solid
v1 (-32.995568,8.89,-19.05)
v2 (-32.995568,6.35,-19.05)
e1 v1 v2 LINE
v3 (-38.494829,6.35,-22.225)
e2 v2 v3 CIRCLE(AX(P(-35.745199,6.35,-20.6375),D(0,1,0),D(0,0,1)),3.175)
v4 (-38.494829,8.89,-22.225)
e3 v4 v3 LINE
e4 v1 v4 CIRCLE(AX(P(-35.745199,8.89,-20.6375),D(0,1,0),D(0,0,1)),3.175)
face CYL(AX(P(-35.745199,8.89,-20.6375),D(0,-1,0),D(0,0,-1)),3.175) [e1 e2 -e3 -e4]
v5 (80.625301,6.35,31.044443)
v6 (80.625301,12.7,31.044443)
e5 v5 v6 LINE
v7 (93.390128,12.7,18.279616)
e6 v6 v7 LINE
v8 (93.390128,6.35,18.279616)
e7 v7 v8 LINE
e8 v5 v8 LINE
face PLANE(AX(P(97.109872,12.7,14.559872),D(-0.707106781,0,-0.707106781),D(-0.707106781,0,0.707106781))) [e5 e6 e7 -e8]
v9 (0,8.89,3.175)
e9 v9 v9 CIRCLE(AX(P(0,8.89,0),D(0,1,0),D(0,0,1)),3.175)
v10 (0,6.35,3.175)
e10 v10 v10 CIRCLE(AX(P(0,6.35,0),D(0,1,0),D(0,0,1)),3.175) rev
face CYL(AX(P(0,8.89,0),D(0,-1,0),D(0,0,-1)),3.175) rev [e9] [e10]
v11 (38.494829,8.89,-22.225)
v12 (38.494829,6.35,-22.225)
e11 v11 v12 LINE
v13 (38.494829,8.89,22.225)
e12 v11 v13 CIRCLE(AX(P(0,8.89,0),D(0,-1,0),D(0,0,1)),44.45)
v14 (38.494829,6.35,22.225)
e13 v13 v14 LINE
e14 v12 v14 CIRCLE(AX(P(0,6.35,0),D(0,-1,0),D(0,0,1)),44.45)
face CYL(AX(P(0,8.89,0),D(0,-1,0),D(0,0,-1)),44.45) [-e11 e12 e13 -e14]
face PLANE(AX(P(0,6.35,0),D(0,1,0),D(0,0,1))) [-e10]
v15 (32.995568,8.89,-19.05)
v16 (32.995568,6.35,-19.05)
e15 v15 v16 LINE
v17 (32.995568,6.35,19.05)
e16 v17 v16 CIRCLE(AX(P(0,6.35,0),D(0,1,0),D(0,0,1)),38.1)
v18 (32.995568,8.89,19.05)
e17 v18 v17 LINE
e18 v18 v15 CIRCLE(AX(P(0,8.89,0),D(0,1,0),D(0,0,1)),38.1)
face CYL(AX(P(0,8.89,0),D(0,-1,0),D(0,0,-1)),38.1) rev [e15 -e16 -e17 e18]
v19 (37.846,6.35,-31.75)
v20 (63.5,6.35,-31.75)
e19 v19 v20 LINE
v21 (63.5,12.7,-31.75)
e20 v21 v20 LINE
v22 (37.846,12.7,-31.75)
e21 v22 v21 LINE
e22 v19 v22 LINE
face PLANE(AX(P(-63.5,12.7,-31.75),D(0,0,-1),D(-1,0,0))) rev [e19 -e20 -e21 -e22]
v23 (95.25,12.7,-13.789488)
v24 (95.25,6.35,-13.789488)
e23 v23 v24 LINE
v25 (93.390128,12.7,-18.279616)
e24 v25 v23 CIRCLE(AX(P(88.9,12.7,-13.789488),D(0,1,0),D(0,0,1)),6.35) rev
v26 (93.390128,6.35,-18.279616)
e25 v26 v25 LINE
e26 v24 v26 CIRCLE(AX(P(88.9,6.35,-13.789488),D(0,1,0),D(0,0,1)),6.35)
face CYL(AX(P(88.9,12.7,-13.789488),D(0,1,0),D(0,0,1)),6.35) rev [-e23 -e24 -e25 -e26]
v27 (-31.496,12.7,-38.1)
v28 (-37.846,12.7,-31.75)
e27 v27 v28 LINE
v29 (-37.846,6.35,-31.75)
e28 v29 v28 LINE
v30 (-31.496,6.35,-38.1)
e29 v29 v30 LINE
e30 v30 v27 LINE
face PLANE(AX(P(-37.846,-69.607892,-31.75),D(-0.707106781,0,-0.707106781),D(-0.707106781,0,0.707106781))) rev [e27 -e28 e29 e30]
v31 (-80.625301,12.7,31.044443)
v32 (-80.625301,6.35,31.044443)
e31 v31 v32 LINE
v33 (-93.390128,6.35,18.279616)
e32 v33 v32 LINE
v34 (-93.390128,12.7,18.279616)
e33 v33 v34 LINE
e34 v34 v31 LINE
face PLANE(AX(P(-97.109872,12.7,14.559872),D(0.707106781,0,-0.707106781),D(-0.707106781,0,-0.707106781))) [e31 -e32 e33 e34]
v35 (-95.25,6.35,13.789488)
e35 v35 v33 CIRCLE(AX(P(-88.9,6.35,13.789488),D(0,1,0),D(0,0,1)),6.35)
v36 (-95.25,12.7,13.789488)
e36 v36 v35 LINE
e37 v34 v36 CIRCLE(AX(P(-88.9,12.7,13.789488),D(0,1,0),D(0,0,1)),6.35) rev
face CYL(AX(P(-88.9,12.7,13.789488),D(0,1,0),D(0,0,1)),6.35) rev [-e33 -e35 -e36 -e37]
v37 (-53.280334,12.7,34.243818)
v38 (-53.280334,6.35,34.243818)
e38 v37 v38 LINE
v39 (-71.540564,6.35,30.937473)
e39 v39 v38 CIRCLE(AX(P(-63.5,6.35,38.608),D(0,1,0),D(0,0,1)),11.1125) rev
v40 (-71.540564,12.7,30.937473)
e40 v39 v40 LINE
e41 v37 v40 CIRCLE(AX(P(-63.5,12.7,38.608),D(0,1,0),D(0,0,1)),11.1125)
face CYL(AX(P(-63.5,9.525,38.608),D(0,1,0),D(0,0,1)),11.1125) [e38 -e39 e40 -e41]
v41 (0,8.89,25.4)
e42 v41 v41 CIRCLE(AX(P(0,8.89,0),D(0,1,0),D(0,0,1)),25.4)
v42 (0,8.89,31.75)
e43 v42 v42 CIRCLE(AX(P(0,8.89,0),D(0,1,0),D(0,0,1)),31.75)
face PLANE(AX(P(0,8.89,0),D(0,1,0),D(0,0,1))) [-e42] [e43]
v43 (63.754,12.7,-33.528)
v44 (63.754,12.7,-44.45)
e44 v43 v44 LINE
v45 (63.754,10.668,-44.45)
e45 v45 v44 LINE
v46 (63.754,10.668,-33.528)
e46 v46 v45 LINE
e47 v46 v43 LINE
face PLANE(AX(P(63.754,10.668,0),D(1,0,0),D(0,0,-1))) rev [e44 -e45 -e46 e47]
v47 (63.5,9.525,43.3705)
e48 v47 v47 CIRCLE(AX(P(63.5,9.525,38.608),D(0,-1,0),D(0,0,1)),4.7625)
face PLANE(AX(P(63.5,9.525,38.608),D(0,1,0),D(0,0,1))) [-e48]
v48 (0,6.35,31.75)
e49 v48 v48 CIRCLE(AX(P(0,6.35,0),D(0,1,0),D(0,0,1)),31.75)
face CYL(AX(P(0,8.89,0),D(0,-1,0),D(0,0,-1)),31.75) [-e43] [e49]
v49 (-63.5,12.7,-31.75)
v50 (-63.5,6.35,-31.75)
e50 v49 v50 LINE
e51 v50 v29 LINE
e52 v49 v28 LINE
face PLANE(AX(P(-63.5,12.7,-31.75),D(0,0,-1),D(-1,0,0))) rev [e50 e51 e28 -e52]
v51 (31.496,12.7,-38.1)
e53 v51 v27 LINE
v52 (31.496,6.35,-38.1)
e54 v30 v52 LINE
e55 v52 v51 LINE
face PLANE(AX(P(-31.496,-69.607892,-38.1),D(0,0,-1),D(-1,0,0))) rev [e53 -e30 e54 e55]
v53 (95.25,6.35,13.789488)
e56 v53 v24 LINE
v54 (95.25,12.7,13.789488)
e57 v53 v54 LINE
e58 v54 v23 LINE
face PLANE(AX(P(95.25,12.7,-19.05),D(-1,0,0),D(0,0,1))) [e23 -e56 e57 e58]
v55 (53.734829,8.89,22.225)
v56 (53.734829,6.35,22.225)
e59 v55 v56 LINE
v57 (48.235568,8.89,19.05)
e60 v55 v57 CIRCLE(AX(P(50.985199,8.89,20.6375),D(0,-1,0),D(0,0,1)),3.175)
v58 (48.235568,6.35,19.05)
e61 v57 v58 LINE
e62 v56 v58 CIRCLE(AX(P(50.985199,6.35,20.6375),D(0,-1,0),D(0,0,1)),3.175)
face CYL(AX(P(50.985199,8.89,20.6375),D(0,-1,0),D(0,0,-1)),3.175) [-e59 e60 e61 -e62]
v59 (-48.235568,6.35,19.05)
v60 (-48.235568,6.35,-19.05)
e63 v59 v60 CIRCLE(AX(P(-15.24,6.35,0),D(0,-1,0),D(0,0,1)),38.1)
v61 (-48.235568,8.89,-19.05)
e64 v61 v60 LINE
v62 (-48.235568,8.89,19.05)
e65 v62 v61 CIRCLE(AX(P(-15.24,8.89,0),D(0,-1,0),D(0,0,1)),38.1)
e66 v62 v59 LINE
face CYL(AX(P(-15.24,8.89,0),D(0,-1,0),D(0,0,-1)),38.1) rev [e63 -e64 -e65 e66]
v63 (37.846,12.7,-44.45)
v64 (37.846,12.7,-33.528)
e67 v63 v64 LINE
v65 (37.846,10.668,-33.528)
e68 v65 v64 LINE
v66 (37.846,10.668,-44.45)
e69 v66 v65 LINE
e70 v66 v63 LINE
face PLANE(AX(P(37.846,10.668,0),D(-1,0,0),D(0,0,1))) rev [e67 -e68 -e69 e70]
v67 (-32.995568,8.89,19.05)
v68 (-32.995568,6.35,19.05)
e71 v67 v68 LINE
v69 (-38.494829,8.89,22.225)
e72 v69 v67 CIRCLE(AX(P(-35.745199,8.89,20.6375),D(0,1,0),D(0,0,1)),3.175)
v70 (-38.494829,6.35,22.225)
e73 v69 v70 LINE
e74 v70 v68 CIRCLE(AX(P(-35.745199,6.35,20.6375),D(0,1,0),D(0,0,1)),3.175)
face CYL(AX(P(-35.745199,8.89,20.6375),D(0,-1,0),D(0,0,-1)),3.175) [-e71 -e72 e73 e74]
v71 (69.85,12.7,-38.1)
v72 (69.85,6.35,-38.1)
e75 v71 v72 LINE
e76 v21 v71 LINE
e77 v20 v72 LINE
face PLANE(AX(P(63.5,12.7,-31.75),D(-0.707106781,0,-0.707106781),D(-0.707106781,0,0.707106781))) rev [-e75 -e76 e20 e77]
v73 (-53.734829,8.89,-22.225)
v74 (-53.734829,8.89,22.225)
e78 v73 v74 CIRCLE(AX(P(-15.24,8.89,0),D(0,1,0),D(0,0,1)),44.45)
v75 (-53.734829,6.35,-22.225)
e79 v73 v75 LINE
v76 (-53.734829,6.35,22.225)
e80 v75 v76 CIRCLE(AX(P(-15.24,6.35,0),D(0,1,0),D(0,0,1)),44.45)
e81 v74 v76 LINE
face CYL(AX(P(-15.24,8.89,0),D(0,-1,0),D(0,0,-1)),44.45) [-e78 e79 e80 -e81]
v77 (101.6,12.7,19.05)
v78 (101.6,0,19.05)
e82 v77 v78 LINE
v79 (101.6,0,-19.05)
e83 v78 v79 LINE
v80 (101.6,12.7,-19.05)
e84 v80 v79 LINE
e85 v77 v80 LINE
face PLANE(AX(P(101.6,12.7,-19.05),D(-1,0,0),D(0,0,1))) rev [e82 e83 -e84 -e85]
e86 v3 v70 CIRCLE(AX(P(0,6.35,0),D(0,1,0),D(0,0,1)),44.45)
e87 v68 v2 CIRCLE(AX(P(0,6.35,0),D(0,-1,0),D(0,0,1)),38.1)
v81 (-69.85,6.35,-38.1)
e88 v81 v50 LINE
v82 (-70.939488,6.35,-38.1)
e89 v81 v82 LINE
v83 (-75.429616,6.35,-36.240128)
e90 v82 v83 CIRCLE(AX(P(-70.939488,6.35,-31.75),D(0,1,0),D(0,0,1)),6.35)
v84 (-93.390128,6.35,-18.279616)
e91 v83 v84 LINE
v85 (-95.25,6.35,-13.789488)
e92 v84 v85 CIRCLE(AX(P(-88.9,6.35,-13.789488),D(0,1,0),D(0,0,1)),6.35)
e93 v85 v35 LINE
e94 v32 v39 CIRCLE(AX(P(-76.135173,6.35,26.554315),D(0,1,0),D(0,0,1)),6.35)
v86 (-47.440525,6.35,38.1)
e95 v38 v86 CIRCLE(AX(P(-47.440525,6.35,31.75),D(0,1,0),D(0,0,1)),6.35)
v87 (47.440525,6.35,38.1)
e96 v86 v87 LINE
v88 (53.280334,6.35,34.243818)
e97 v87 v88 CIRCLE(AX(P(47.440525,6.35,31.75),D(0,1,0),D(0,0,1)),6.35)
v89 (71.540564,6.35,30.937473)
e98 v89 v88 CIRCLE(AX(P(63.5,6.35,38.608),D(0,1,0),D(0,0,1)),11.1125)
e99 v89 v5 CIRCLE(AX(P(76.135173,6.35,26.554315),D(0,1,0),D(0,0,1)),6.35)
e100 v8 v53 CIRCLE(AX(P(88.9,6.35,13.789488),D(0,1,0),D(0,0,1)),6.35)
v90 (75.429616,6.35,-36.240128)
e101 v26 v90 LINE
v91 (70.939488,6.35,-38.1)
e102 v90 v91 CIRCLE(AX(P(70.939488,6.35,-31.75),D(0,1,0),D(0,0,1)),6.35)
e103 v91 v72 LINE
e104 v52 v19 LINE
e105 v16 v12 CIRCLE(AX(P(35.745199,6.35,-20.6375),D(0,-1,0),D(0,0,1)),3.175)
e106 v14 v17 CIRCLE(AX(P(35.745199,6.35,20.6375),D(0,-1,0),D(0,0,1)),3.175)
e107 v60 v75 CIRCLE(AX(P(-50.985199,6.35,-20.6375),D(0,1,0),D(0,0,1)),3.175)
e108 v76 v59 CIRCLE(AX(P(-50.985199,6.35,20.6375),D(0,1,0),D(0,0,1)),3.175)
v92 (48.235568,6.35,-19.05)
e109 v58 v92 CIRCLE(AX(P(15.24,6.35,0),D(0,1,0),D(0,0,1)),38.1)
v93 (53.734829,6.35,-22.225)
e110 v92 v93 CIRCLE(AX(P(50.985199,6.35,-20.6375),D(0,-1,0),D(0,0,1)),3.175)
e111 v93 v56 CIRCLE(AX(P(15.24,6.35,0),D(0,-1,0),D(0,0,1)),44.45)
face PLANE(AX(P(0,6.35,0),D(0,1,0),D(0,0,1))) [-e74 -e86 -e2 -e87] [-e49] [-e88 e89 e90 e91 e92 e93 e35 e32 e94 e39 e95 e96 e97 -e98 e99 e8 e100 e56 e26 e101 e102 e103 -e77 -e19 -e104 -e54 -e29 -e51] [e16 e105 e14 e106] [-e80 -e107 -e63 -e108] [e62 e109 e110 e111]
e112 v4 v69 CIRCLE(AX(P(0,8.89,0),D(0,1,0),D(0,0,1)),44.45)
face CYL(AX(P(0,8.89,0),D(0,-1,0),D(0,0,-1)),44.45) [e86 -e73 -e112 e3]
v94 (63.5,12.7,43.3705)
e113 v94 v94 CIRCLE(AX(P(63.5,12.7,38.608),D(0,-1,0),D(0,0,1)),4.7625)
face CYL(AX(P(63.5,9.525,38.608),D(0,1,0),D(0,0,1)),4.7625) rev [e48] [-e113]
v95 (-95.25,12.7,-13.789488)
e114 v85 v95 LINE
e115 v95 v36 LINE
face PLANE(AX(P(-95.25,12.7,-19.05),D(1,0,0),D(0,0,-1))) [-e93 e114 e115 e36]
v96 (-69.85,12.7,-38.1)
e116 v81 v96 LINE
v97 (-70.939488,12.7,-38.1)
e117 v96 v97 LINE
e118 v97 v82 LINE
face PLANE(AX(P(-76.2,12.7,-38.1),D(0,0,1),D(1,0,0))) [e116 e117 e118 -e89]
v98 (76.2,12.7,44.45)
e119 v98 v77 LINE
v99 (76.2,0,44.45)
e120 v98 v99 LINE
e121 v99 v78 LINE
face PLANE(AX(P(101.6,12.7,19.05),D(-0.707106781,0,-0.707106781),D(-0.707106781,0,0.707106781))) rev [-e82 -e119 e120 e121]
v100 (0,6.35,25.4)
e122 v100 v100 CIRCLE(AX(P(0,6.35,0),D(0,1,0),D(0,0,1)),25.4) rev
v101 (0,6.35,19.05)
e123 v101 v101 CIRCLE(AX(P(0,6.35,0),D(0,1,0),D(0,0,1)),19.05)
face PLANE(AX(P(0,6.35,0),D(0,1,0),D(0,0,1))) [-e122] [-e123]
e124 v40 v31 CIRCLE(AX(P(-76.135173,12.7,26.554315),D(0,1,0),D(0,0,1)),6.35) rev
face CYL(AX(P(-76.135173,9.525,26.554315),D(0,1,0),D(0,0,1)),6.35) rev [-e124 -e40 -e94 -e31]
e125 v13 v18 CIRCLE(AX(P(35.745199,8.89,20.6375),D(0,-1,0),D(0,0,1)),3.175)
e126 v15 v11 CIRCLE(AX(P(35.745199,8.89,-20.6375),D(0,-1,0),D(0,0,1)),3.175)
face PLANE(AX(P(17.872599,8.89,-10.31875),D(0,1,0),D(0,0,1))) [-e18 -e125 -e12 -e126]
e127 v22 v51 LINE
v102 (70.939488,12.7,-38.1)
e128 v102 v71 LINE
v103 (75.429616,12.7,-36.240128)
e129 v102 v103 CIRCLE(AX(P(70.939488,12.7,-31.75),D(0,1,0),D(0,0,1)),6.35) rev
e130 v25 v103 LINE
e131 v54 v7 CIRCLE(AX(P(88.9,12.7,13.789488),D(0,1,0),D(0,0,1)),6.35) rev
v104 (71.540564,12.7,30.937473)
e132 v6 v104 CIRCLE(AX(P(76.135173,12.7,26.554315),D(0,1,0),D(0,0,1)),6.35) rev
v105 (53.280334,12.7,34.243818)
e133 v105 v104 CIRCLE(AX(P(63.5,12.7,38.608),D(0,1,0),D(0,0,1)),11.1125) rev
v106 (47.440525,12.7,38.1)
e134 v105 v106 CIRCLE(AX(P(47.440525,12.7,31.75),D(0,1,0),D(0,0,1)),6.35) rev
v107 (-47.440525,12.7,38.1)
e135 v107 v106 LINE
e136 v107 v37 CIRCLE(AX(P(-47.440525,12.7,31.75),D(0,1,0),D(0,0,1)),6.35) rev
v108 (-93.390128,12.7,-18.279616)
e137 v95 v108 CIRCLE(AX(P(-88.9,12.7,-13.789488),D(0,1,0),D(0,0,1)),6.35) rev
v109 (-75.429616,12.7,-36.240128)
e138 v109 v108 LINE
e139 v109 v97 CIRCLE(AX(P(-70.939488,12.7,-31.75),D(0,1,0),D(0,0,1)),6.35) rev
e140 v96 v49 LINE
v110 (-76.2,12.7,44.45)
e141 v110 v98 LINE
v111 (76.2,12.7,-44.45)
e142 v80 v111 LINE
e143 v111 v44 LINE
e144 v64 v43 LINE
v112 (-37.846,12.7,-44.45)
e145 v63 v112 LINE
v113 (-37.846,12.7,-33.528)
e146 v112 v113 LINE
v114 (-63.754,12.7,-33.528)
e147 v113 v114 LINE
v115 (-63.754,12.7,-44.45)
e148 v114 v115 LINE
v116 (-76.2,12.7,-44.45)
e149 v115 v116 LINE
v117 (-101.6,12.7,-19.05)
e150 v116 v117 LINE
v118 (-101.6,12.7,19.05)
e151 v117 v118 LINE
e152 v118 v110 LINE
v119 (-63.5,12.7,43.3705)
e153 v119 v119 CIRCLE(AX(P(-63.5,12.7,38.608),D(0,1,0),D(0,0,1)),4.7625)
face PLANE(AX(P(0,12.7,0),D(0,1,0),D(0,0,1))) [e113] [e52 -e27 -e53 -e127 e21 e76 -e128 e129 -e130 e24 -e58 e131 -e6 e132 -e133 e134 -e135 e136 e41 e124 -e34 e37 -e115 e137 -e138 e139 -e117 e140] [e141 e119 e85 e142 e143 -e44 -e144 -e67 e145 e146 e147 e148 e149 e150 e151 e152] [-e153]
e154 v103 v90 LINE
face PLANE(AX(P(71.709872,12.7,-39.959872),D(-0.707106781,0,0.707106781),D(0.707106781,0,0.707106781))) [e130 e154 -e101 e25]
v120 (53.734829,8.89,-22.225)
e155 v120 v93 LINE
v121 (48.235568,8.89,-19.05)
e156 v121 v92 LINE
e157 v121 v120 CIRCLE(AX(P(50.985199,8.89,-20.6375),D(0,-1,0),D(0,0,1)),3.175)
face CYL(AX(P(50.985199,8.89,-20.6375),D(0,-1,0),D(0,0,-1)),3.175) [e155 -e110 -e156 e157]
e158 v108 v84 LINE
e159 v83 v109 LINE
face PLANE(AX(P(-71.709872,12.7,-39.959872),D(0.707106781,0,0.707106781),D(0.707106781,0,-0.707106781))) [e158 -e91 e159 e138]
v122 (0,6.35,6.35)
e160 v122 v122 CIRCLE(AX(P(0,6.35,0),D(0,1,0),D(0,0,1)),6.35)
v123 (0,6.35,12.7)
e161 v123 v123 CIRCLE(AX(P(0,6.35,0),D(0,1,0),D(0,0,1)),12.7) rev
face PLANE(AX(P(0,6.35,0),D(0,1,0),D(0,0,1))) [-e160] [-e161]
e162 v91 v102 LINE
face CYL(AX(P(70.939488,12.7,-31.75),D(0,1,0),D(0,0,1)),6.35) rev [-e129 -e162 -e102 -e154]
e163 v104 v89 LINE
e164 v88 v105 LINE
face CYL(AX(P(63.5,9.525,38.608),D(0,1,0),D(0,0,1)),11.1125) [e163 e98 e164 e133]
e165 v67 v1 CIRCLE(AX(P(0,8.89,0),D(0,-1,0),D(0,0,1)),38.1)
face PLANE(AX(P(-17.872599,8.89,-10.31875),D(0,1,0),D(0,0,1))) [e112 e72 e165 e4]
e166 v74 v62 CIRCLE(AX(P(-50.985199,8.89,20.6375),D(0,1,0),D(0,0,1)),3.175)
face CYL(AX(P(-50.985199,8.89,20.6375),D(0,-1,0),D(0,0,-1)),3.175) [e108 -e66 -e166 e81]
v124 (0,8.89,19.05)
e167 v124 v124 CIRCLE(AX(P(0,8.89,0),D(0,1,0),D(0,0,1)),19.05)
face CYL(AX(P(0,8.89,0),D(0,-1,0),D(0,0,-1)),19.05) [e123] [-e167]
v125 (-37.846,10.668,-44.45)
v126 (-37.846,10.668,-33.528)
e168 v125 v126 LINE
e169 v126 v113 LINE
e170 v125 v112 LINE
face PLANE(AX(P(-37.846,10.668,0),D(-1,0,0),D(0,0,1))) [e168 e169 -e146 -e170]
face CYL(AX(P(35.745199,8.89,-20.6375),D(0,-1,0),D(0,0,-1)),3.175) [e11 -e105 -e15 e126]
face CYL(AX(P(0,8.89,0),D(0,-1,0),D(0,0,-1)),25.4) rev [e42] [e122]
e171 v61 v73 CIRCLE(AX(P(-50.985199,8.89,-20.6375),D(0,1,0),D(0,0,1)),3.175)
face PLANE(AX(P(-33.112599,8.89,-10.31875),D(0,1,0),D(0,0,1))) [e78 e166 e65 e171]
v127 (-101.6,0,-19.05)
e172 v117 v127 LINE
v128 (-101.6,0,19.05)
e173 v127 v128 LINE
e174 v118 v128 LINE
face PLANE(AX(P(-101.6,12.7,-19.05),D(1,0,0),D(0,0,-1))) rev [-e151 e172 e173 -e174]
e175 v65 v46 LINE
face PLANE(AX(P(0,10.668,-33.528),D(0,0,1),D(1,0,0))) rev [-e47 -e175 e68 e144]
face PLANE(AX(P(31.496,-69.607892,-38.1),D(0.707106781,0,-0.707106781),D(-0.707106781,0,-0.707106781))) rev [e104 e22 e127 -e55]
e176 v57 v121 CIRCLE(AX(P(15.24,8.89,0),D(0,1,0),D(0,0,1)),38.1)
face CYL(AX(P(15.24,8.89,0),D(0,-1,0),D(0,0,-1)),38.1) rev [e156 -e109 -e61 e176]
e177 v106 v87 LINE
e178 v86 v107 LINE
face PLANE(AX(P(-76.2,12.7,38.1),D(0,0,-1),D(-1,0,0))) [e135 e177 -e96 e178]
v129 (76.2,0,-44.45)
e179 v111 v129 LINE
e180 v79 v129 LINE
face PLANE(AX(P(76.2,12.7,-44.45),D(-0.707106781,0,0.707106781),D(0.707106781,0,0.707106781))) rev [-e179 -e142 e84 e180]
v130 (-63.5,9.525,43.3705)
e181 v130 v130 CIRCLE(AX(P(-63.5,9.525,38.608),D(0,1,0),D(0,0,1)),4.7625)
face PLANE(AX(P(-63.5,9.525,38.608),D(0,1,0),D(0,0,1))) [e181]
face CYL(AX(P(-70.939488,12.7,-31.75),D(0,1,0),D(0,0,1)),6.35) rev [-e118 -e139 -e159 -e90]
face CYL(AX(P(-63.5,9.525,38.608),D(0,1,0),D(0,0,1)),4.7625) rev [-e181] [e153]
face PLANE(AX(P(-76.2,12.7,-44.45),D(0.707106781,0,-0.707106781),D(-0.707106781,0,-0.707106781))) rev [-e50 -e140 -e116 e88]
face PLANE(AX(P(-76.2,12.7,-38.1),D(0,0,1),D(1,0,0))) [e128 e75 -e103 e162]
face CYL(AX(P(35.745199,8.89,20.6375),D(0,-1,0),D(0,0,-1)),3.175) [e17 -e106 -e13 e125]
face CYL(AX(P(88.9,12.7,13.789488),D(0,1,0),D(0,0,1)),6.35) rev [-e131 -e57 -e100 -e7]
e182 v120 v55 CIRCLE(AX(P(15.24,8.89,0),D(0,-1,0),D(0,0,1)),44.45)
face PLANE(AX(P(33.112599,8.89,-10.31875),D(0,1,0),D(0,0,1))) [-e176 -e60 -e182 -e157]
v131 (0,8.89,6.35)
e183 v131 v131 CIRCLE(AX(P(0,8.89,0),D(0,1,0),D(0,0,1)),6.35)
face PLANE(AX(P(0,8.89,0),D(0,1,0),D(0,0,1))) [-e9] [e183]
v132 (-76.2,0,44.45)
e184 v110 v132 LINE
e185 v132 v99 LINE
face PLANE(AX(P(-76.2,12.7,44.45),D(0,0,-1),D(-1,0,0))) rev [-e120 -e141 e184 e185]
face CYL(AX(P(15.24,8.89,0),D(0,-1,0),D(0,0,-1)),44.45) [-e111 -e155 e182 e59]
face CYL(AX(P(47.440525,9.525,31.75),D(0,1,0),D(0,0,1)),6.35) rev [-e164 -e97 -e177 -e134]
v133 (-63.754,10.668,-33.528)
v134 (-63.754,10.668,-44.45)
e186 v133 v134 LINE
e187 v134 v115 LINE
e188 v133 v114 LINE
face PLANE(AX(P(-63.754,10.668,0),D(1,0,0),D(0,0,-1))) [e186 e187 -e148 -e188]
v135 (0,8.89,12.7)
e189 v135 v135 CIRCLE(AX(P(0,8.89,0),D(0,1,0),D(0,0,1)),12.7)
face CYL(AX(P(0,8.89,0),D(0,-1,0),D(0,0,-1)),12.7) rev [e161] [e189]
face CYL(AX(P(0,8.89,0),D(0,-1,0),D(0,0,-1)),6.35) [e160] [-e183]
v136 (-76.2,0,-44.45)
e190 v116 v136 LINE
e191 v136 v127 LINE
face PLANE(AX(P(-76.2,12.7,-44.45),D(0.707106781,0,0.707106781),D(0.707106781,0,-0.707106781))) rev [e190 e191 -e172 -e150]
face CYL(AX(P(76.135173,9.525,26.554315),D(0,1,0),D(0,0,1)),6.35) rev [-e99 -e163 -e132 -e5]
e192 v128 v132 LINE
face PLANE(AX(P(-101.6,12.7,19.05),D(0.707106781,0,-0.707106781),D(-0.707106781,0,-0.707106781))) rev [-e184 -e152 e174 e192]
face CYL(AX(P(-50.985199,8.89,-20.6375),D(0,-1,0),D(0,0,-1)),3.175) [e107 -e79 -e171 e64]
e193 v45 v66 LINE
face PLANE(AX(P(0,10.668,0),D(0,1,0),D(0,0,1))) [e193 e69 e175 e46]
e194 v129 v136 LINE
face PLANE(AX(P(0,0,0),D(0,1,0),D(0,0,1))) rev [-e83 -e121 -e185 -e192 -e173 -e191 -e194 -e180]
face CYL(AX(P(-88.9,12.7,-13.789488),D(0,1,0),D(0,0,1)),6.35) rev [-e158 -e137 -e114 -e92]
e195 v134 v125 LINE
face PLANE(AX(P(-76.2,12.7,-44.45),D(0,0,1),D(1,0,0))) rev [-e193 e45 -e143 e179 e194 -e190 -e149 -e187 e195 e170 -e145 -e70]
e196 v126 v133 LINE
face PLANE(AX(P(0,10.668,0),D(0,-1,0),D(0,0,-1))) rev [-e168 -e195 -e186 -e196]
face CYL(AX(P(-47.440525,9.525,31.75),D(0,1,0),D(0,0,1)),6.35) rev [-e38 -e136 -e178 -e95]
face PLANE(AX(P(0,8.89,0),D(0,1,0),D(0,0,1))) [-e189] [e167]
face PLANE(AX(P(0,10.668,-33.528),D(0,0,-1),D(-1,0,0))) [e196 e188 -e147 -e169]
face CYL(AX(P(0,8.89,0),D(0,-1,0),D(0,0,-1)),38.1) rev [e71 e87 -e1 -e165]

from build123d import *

# Parameters (mm, degrees)
BOSS_EXTRUDE1_DEPTH  = 12.7
SKETCH2_R            = 4.7625
CUT_EXTRUDE1_DEPTH   = 3.175
SHELL2_START         = 6.35
SHELL2_DEPTH         = 6.35
FILLET3_R            = 6.35
BOSS_EXTRUDE2_DEPTH  = 6.35
CUT_EXTRUDE2_START   = 6.35
SKETCH4_W            = 25.908
SKETCH4_H            = 10.922
CUT_EXTRUDE2_DEPTH   = 2.032
CUT_EXTRUDE3_DEPTH   = 6.35
SKETCH6_R            = 31.75
SKETCH6_R_2          = 25.4
BOSS_EXTRUDE3_DEPTH  = 2.54
SKETCH7_R            = 19.05
SKETCH7_R_2          = 12.7
BOSS_EXTRUDE4_DEPTH  = 2.54
SKETCH8_R            = 6.35
SKETCH8_R_2          = 3.175
BOSS_EXTRUDE5_DEPTH  = 2.54
BOSS_EXTRUDE6_DEPTH  = 2.54
LPATTERN1_COUNT      = 2
LPATTERN1_PITCH      = 15.24
MIRROR3_COPY_1_DEPTH = 2.54


# Read off the part's stored shape, not the designer's step: Shell2
with BuildPart() as part:
    # Sketch1 → Boss-Extrude1 (new body)
    with BuildSketch(Plane(origin=(0, 0, 0), x_dir=(1, 0, 0), z_dir=(0, 1, 0))):
        Polygon((-76.2, 44.45), (-101.6, 19.05), (-101.6, -19.05), (-76.2, -44.45), (76.2, -44.45), (101.6, -19.05), (101.6, 19.05), (76.2, 44.45), align=None)
    extrude(amount=BOSS_EXTRUDE1_DEPTH)

    # Sketch2 → Cut-Extrude1 (cut)
    with BuildSketch(Plane(origin=(0, 12.7, 0), x_dir=(1, 0, 0), z_dir=(0, 1, 0))):
        with Locations(Location((-63.5, -38.608, 0), (0, 0, 270))):
            Circle(SKETCH2_R)
    cut_extrude1 = extrude(amount=-CUT_EXTRUDE1_DEPTH, mode=Mode.SUBTRACT)

    # Mirror1: Cut-Extrude1 across plane
    add(cut_extrude1.mirror(Plane(origin=(0, 0, 0), x_dir=(0, 0, 1), z_dir=(1, 0, 0))), mode=Mode.SUBTRACT)

    # Shell2 outline → Shell2 (cut)
    with BuildSketch(Plane(origin=(0, 0, 0), x_dir=(1, 0, 0), z_dir=(0, 1, 0)).offset(SHELL2_START)):
        with BuildLine():
            Line((74.516823481, -37.152920398), (95.25, -16.419743879))
            Line((95.25, -16.419743879), (95.25, 16.419743879))
            Line((95.25, 16.419743879), (73.569743879, 38.1))
            Line((73.569743879, 38.1), (-73.569743879, 38.1))
            Line((-73.569743879, 38.1), (-95.25, 16.419743879))
            Line((-95.25, 16.419743879), (-95.25, -16.419743879))
            Line((-95.25, -16.419743879), (-74.516823481, -37.152920398))
            ThreePointArc((-74.516823481, -37.152920398), (-63.024598672, -27.505673675), (-52.399117501, -38.1))
            Line((-52.399117501, -38.1), (52.399117501, -38.1))
            ThreePointArc((52.399117501, -38.1), (63.024598672, -27.505673675), (74.516823481, -37.152920398))
        make_face()
    extrude(amount=SHELL2_DEPTH, mode=Mode.SUBTRACT)

    # Fillet3
    fillet3_edges = [part.edges().sort_by_distance(p)[0] for p in [
        (95.25, 9.525, 16.419743879),
        (95.25, 9.525, -16.419743879),
        (73.569743879, 9.525, -38.1),
        (-73.569743879, 9.525, -38.1),
        (-95.25, 9.525, -16.419743879),
        (-95.25, 9.525, 16.419743879),
        (52.399117501, 9.525, 38.1),
        (-52.399117501, 9.525, 38.1),
        (-74.516823481, 9.525, 37.152920398),
        (74.516823481, 9.525, 37.152920398),
    ]]
    fillet(fillet3_edges, radius=FILLET3_R)

    # Sketch3 → Boss-Extrude2 (add)
    with BuildSketch(Plane(origin=(0, 6.35, 0), x_dir=(1, 0, 0), z_dir=(0, 1, 0))):
        Polygon((-76.2, 44.45), (-63.5, 31.75), (63.5, 31.75), (76.2, 44.45), align=None)
    extrude(amount=BOSS_EXTRUDE2_DEPTH)

    # Sketch4 → Cut-Extrude2 (cut)
    with BuildSketch(Plane(origin=(0, 6.35, 0), x_dir=(1, 0, 0), z_dir=(0, 1, 0)).offset(CUT_EXTRUDE2_START)):
        with Locations((-50.8, 38.989)):
            Rectangle(SKETCH4_W, SKETCH4_H)
    cut_extrude2 = extrude(amount=-CUT_EXTRUDE2_DEPTH, mode=Mode.SUBTRACT)

    # Mirror2: Cut-Extrude2 across plane
    add(cut_extrude2.mirror(Plane(origin=(0, 0, 0), x_dir=(0, 0, 1), z_dir=(1, 0, 0))), mode=Mode.SUBTRACT)

    # Sketch5 → Cut-Extrude3 (cut)
    with BuildSketch(Plane(origin=(0, 12.7, 0), x_dir=(1, 0, 0), z_dir=(0, 1, 0))):
        Polygon((-37.846, 31.75), (-31.496, 38.1), (31.496, 38.1), (37.846, 31.75), align=None)
    extrude(amount=-CUT_EXTRUDE3_DEPTH, mode=Mode.SUBTRACT)

    # Sketch6 → Boss-Extrude3 (add)
    with BuildSketch(Plane(origin=(0, 6.35, 0), x_dir=(1, 0, 0), z_dir=(0, 1, 0))):
        with Locations(Location((0, 0, 0), (0, 0, 270))):
            Circle(SKETCH6_R)
        with Locations(Location((0, 0, 0), (0, 0, 270))):
            Circle(SKETCH6_R_2, mode=Mode.SUBTRACT)
    extrude(amount=BOSS_EXTRUDE3_DEPTH)

    # Sketch7 → Boss-Extrude4 (add)
    with BuildSketch(Plane(origin=(0, 6.35, 0), x_dir=(1, 0, 0), z_dir=(0, 1, 0))):
        with Locations(Location((0, 0, 0), (0, 0, 270))):
            Circle(SKETCH7_R)
        with Locations(Location((0, 0, 0), (0, 0, 270))):
            Circle(SKETCH7_R_2, mode=Mode.SUBTRACT)
    extrude(amount=BOSS_EXTRUDE4_DEPTH)

    # Sketch8 → Boss-Extrude5 (add)
    with BuildSketch(Plane(origin=(0, 6.35, 0), x_dir=(1, 0, 0), z_dir=(0, 1, 0))):
        with Locations(Location((0, 0, 0), (0, 0, 270))):
            Circle(SKETCH8_R)
        with Locations(Location((0, 0, 0), (0, 0, 270))):
            Circle(SKETCH8_R_2, mode=Mode.SUBTRACT)
    extrude(amount=BOSS_EXTRUDE5_DEPTH)

    # Sketch9 → Boss-Extrude6 (add)
    with BuildSketch(Plane(origin=(0, 6.35, 0), x_dir=(1, 0, 0), z_dir=(0, 1, 0))):
        with BuildLine():
            ThreePointArc((-38.494829198, 22.225), (-44.45, 0), (-38.494829198, -22.225))
            ThreePointArc((-38.494829198, -22.225), (-34.157698541, -23.387130657), (-32.995567884, -19.05))
            ThreePointArc((-32.995567884, -19.05), (-38.1, 0), (-32.995567884, 19.05))
            ThreePointArc((-32.995567884, 19.05), (-34.157698541, 23.387130657), (-38.494829198, 22.225))
        make_face()
    boss_extrude6 = extrude(amount=BOSS_EXTRUDE6_DEPTH)

    # LPattern1: Boss-Extrude6 ×2
    with Locations(*[(-i * LPATTERN1_PITCH, 0, 0) for i in range(1, LPATTERN1_COUNT)]):
        add(boss_extrude6)

    # Mirror3: Boss-Extrude6 across plane
    add(boss_extrude6.mirror(Plane(origin=(0, 0, 0), x_dir=(0, 0, 1), z_dir=(1, 0, 0))))

    # Mirror3 copy 1 sketch → Mirror3 copy 1 (add)
    with BuildSketch(Plane(origin=(15.24, 6.35, 0), x_dir=(-1, 0, 0), z_dir=(0, 1, 0))):
        with BuildLine():
            ThreePointArc((-38.494829198, -22.225), (-44.45, 0), (-38.494829198, 22.225))
            ThreePointArc((-38.494829198, 22.225), (-34.157698541, 23.387130657), (-32.995567884, 19.05))
            ThreePointArc((-32.995567884, 19.05), (-38.1, 0), (-32.995567884, -19.05))
            ThreePointArc((-32.995567884, -19.05), (-34.157698541, -23.387130657), (-38.494829198, -22.225))
        make_face()
    extrude(amount=MIRROR3_COPY_1_DEPTH)


solid = part.part
